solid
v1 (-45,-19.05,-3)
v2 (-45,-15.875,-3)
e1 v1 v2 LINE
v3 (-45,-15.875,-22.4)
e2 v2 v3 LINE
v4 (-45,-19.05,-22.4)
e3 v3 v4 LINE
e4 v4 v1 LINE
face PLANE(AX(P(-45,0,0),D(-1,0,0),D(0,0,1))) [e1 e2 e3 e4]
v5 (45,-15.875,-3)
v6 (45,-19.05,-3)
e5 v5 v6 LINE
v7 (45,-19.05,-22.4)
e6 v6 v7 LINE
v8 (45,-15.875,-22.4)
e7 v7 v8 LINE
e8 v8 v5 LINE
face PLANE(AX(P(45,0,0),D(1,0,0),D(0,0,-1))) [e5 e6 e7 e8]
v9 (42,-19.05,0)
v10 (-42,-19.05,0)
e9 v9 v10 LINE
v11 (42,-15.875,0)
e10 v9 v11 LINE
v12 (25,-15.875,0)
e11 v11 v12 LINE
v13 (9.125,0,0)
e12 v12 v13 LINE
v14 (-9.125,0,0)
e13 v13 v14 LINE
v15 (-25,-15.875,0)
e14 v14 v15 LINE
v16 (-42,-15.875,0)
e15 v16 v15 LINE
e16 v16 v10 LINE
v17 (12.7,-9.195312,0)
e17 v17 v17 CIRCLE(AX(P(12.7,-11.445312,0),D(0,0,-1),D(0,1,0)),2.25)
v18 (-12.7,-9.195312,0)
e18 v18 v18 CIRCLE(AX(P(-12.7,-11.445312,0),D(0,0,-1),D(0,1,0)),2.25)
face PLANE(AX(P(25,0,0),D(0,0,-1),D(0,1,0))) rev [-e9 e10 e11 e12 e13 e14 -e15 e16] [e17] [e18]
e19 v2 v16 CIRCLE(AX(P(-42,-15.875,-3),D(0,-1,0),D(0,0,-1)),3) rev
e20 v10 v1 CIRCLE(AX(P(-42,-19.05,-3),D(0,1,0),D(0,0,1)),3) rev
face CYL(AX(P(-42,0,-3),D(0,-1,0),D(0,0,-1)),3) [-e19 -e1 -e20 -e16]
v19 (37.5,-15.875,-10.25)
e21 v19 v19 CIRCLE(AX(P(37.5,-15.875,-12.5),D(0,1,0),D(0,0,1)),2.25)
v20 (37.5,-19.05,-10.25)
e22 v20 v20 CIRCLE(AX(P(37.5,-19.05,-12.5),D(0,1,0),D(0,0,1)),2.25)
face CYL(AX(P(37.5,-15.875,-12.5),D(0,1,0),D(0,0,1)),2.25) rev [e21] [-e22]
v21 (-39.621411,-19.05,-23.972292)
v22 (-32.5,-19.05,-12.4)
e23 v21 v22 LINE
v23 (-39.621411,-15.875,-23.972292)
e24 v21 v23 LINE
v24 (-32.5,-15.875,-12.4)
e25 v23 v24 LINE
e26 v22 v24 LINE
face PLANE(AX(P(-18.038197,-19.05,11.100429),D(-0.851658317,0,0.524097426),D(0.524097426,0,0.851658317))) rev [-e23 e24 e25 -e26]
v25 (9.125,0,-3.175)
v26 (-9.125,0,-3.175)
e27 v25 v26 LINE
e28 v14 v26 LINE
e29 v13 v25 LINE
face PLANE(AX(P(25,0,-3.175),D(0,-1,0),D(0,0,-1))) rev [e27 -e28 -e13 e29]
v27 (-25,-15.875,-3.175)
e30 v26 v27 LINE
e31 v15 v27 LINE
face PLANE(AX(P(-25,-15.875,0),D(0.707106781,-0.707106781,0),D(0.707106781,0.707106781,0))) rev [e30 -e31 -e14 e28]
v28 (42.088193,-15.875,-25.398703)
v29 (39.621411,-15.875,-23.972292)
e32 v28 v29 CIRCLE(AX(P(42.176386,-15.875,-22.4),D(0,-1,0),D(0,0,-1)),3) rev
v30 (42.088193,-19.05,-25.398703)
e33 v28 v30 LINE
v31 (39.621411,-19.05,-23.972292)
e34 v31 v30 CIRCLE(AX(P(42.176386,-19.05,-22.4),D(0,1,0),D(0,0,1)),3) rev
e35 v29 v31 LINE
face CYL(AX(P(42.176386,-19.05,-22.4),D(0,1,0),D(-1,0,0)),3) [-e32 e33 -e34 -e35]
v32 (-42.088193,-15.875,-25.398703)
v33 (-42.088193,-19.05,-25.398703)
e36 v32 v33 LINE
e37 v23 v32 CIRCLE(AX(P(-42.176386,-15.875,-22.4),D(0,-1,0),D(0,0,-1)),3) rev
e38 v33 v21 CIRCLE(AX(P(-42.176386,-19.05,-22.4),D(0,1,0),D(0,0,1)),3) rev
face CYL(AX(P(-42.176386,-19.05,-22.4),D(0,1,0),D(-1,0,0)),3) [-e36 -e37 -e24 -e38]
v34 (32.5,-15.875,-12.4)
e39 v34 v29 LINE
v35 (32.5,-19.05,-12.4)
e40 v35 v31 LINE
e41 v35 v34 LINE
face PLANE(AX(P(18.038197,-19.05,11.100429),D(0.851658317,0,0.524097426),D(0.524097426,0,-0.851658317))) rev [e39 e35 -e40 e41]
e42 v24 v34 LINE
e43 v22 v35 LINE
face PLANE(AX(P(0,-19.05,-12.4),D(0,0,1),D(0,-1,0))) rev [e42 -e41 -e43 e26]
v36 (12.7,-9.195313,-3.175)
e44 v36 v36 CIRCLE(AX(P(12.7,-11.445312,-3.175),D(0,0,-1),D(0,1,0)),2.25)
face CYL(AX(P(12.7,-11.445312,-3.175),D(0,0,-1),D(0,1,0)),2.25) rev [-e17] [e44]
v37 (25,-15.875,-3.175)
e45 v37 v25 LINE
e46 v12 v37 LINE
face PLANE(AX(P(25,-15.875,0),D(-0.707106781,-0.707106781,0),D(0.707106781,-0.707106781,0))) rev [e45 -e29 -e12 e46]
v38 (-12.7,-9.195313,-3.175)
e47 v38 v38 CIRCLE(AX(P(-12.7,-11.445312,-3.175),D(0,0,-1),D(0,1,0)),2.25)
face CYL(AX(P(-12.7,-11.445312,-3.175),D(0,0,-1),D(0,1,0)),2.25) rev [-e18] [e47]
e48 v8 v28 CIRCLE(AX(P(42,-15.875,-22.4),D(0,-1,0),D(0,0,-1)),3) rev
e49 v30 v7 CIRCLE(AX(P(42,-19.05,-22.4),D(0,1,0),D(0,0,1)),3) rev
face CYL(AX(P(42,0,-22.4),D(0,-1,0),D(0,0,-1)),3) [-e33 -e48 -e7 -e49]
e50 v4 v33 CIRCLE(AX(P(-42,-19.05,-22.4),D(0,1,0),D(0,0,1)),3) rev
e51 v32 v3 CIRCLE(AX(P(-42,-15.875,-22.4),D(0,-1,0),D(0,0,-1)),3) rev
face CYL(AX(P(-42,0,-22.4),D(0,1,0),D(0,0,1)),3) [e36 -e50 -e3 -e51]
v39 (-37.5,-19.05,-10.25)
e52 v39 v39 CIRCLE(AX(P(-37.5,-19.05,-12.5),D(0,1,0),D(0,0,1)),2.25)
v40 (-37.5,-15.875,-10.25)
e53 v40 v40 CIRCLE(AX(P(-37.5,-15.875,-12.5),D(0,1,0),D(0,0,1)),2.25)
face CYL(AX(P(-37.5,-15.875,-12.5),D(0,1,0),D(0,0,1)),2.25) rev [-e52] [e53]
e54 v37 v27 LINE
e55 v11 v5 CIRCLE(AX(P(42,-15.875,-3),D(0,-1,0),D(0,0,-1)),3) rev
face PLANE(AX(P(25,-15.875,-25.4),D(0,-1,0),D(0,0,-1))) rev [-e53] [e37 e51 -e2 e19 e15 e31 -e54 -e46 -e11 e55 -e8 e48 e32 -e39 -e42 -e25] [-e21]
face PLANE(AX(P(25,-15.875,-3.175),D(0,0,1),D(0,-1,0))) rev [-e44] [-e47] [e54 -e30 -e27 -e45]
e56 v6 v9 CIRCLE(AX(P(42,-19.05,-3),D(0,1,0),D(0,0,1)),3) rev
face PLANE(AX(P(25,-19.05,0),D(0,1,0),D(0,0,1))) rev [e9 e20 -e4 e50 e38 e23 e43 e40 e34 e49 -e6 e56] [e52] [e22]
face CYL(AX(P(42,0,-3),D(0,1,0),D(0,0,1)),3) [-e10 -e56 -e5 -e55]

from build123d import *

# Parameters (mm, degrees)
BOSS_EXTRUDE1_DEPTH  = 25
CUT_EXTRUDE1_DEPTH   = 39.494845434
M4_CLEARANCE_HOLE1_D = 4.5
SKETCH5_W            = 25.4
SKETCH5_H            = 3.175
BOSS_EXTRUDE2_DEPTH  = 20
SKETCH6_W            = 25.4
SKETCH6_H            = 3.175
BOSS_EXTRUDE3_DEPTH  = 20
M4_CLEARANCE_HOLE2_D = 4.5
CUT_EXTRUDE2_DEPTH   = 55.05715147
FILLET1_R            = 3


with BuildPart() as part:
    # Sketch1 → Boss-Extrude1 (new, symmetric)
    with BuildSketch(Plane(origin=(0, 0, 0), x_dir=(0, 0, -1), z_dir=(1, 0, 0))):
        Polygon((0, 0), (0, -19.05), (25.4, -19.05), (25.4, -15.875), (3.175, -15.875), (3.175, 0), align=None)
    extrude(amount=BOSS_EXTRUDE1_DEPTH, both=True)

    # Sketch2 → Cut-Extrude1 (cut, through all)
    with BuildSketch(Plane(origin=(0, 0, -3.175), x_dir=(-1, 0, 0), z_dir=(0, 0, -1))):
        Polygon((-25, -15.875), (-9.125, 0), (-25, 0), align=None)
        Polygon((25, -15.875), (9.125, 0), (25, 0), align=None)
    extrude(amount=-CUT_EXTRUDE1_DEPTH, mode=Mode.SUBTRACT)

    # M4 Clearance Hole1 (through all)
    with Locations(Plane(origin=(0, 0, -3.175), x_dir=(-1, 0, 0), z_dir=(0, 0, -1))):
        with Locations((-12.7, -11.4453125), (12.7, -11.4453125)):
            Hole(M4_CLEARANCE_HOLE1_D / 2)

    # Sketch5 → Boss-Extrude2 (add)
    with BuildSketch(Plane(origin=(25, 0, 0), x_dir=(0, 0, -1), z_dir=(1, 0, 0))):
        with Locations((12.7, -17.4625)):
            Rectangle(SKETCH5_W, SKETCH5_H)
    extrude(amount=BOSS_EXTRUDE2_DEPTH)

    # Sketch6 → Boss-Extrude3 (add)
    with BuildSketch(Plane.ZY.offset(25)):
        with Locations((-12.7, -17.4625)):
            Rectangle(SKETCH6_W, SKETCH6_H)
    extrude(amount=BOSS_EXTRUDE3_DEPTH)

    # M4 Clearance Hole2 (through all)
    with Locations(Plane(origin=(0, -15.875, 0), x_dir=(1, 0, 0), z_dir=(0, 1, 0))):
        with Locations((37.5, 12.5), (-37.5, 12.5)):
            Hole(M4_CLEARANCE_HOLE2_D / 2)

    # Sketch9 → Cut-Extrude2 (cut, through all)
    with BuildSketch(Plane(origin=(0, -15.875, 0), x_dir=(1, 0, 0), z_dir=(0, 1, 0))):
        Polygon((40.5, 25.4), (-40.5, 25.4), (-32.5, 12.4), (32.5, 12.4), align=None)
    extrude(amount=-CUT_EXTRUDE2_DEPTH, mode=Mode.SUBTRACT)

    # Fillet1
    # the kernel refuses this fillet: 3 mm, written as the material it takes off along each edge
    with BuildSketch(Plane(origin=(-45, -26.55, -25.4), x_dir=(0, 0, 1), z_dir=(0, 1, 0)), Plane(origin=(45, -8.375, -25.4), x_dir=(0, 0, 1), z_dir=(0, -1, 0))) as fillet1_piece_1:
        with BuildLine():
            CenterArc((FILLET1_R, FILLET1_R), FILLET1_R, 180, 90)
            Line((0, FILLET1_R), (0, 0))
            Line((0, 0), (FILLET1_R, 0))
        make_face()
    extrude(amount=18.175, mode=Mode.SUBTRACT)
    with BuildSketch(Plane(origin=(-40.5, -11.684036045, -25.4), x_dir=(-1, 0, 0), z_dir=(0, -1, 0)), Plane(origin=(40.5, -11.684036045, -25.4), x_dir=(-0.5240974256643328, 0, 0.8516583167045451), z_dir=(0, -1, 0))) as fillet1_piece_2:
        with BuildLine():
            CenterArc((FILLET1_R * 0.558795194036, -FILLET1_R), FILLET1_R, 90, 58.392497754)
            Line((-FILLET1_R * 0.292863122668, -FILLET1_R * 0.475902574336), (0, 0))
            Line((0, 0), (FILLET1_R * 0.558795194036, 0))
        make_face()
    extrude(amount=11.556927911, mode=Mode.SUBTRACT)
    with BuildSketch(Plane(origin=(45, -26.55, 0), x_dir=(-1, 0, 0), z_dir=(0, 1, 0)), Plane(origin=(-45, -8.375, 0), x_dir=(1, 0, 0), z_dir=(0, -1, 0))) as fillet1_piece_3:
        with BuildLine():
            CenterArc((FILLET1_R, -FILLET1_R), FILLET1_R, 90, 90)
            Line((0, -FILLET1_R), (0, 0))
            Line((0, 0), (FILLET1_R, 0))
        make_face()
    extrude(amount=18.175, mode=Mode.SUBTRACT)


solid = part.part
